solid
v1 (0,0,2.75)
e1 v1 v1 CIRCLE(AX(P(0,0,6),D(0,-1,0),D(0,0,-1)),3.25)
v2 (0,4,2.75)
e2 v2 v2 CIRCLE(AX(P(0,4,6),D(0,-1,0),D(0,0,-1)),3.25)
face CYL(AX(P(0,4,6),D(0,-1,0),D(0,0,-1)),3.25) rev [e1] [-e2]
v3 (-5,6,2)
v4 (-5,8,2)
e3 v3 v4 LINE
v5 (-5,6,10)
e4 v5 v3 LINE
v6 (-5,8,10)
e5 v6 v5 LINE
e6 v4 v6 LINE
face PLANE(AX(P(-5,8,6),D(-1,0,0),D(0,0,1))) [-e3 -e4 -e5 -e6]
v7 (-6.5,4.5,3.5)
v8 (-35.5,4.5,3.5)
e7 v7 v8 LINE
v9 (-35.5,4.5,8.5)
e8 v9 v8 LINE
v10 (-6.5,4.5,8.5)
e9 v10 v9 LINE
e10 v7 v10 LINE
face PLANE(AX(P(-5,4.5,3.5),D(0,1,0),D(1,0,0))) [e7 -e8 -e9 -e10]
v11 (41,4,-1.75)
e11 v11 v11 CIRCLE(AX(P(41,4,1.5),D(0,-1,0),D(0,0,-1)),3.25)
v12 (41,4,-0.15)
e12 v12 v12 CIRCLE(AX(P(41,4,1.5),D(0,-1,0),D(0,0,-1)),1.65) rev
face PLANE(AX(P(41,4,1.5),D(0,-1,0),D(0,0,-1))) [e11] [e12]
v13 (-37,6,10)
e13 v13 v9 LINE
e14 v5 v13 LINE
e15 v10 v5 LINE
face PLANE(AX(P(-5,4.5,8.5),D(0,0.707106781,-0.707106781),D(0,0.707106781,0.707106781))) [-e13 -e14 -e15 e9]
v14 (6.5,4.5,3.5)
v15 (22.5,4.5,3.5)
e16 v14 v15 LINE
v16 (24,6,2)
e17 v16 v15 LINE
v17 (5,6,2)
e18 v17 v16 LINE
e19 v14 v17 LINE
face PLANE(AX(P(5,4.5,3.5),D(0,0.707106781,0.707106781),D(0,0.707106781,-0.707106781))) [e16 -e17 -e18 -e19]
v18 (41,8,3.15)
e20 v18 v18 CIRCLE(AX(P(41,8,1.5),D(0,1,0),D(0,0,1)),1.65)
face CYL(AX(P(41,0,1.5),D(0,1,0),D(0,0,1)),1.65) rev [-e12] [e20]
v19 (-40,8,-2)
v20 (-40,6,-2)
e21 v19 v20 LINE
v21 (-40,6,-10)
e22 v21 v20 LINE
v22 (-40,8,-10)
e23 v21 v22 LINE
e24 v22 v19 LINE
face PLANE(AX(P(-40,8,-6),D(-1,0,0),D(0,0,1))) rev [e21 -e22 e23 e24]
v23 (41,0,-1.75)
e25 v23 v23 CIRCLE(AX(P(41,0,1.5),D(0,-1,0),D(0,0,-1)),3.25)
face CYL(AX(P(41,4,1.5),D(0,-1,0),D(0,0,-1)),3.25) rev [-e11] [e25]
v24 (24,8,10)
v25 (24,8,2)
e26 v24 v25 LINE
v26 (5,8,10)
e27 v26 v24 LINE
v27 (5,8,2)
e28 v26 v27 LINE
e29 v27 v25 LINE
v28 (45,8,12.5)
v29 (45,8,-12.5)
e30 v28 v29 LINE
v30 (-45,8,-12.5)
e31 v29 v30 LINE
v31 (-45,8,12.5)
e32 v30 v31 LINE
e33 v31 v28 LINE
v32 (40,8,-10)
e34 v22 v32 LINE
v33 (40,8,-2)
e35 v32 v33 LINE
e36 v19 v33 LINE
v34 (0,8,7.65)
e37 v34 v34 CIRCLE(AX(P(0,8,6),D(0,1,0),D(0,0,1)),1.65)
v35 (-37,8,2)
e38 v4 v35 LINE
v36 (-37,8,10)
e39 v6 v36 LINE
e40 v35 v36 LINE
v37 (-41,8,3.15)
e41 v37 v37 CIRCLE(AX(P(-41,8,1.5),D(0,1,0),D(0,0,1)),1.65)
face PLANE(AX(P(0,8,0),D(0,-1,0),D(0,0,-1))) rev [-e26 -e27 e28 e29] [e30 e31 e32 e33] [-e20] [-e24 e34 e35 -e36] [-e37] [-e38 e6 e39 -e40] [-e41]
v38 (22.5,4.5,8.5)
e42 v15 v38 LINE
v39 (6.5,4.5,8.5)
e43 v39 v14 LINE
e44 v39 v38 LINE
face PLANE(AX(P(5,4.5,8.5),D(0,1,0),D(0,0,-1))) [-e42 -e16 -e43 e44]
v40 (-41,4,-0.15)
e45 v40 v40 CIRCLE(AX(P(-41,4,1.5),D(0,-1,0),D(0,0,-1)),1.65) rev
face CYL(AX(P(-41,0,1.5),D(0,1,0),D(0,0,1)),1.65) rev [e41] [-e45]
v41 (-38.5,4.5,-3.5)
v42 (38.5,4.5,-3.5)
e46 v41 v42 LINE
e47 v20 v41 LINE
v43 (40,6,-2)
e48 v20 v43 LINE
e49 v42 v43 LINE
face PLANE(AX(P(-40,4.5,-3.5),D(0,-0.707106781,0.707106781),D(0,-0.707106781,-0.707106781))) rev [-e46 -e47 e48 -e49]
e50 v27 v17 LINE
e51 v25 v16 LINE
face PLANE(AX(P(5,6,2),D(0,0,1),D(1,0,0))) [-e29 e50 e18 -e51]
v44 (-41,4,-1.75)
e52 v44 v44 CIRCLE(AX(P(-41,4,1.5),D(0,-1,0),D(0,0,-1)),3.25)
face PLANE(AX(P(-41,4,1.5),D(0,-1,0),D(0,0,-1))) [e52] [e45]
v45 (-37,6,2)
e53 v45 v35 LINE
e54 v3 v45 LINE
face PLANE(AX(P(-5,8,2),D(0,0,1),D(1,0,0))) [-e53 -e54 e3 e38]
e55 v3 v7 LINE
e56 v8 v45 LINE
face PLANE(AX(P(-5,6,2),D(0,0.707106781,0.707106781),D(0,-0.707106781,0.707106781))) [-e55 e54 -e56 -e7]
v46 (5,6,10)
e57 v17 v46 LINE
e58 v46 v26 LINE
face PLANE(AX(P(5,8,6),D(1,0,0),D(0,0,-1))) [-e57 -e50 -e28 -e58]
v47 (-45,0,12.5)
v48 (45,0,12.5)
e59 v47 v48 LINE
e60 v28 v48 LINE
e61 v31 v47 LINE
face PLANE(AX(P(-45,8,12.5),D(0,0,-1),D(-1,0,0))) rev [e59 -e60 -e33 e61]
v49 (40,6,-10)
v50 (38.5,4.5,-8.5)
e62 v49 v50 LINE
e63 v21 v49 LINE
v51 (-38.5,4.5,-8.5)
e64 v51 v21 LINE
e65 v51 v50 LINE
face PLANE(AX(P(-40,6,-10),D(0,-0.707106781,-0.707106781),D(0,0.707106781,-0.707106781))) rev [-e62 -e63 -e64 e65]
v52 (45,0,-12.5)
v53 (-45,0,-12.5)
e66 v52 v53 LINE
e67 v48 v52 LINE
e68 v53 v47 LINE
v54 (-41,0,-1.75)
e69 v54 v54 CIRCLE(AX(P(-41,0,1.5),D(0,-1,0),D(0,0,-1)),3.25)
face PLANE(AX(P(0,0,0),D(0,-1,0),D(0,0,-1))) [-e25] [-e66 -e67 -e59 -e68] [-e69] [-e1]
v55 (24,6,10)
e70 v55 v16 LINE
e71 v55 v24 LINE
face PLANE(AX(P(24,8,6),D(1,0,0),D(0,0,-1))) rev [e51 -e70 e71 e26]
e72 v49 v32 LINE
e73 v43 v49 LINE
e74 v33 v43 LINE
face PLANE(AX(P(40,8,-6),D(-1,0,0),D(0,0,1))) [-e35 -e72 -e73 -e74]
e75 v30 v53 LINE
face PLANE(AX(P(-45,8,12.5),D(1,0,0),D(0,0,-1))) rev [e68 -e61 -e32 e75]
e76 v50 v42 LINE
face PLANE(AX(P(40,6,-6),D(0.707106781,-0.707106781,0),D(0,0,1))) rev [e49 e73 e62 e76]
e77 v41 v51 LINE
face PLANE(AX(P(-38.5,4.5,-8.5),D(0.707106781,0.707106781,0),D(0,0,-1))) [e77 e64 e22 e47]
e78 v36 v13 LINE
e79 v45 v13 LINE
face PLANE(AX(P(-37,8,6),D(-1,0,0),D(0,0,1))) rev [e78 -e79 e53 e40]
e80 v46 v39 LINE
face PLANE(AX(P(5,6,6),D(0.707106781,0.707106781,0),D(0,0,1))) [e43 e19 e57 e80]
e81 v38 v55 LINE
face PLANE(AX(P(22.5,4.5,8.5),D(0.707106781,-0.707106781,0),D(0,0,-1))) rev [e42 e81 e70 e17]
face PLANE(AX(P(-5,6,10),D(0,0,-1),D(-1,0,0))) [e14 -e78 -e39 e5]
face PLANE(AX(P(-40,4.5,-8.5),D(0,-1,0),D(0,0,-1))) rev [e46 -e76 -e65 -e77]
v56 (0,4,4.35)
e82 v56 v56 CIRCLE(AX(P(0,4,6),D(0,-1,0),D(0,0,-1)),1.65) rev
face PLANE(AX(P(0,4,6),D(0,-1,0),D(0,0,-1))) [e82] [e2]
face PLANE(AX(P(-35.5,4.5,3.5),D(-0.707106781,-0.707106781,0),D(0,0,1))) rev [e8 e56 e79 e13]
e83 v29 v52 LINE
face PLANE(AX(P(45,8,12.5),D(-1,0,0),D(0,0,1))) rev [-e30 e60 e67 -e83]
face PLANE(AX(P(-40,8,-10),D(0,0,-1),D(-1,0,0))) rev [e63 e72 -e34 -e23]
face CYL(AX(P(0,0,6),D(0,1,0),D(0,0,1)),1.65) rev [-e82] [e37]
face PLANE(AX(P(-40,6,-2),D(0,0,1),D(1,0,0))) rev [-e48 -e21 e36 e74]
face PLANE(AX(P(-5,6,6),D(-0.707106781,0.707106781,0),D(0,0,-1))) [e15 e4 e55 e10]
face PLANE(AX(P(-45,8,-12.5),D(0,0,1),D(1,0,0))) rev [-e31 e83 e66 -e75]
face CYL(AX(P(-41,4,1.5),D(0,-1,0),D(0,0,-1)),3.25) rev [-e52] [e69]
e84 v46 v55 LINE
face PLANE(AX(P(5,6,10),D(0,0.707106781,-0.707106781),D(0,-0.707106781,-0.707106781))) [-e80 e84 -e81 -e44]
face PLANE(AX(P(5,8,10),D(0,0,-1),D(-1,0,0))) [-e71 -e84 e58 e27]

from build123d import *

# Parameters (mm, degrees)
ESQUISSE1_W             = 90
ESQUISSE1_H             = 25
BOSS_EXTRU_1_DEPTH      = 8
ESQUISSE3_R             = 1.65
ENL_V_MAT_EXTRU_1_DEPTH = 48.384069053
ESQUISSE4_R             = 3.25
ENL_V_MAT_EXTRU_2_DEPTH = 4
EMPREINTE1_START        = -10
EMPREINTE1_DEPTH        = 8
EMPREINTE1_START_2      = 2
EMPREINTE1_2_DEPTH      = 8
EMPREINTE1_START_3      = -38.94589
EMPREINTE1_3_DEPTH      = 77.9
EMPREINTE1_START_4      = -41
EMPREINTE1_4_DEPTH      = 82


with BuildPart() as part:
    # Esquisse1 → Boss.-Extru.1 (new body)
    with BuildSketch(Plane(origin=(0, 0, 0), x_dir=(1, 0, 0), z_dir=(0, 1, 0))):
        Rectangle(ESQUISSE1_W, ESQUISSE1_H)
    extrude(amount=BOSS_EXTRU_1_DEPTH)

    # Esquisse3 → Enlèv. mat.-Extru.1 (cut, through all)
    with BuildSketch(Plane(origin=(0, 8, 0), x_dir=(1, 0, 0), z_dir=(0, 1, 0))):
        with Locations(Location((0, -6, 0), (0, 0, 270))):
            Circle(ESQUISSE3_R)
        with Locations(Location((41, -1.5, 0), (0, 0, 270))):
            Circle(ESQUISSE3_R)
        with Locations(Location((-41, -1.5, 0), (0, 0, 270))):
            Circle(ESQUISSE3_R)
    extrude(amount=-ENL_V_MAT_EXTRU_1_DEPTH, mode=Mode.SUBTRACT)

    # Esquisse4 → Enlèv. mat.-Extru.2 (cut)
    with BuildSketch(Plane.XZ):
        with Locations(Location((-41, 1.5, 0), (0, 0, 270))):
            Circle(ESQUISSE4_R)
        with Locations(Location((41, 1.5, 0), (0, 0, 270))):
            Circle(ESQUISSE4_R)
        with Locations(Location((0, 6, 0), (0, 0, 270))):
            Circle(ESQUISSE4_R)
    extrude(amount=-ENL_V_MAT_EXTRU_2_DEPTH, mode=Mode.SUBTRACT)

    # Empreinte1: read off the stored shape, not the designer's step
    # Empreinte1 outline → Empreinte1 (cut)
    with BuildSketch(Plane.XY.offset(EMPREINTE1_START)):
        Polygon((40, 8), (-40, 8), (-40, 6), (-38.5, 4.5), (38.5, 4.5), (40, 6), align=None)
    extrude(amount=EMPREINTE1_DEPTH, mode=Mode.SUBTRACT)

    # Empreinte1 2 outline → Empreinte1 2 (cut)
    with BuildSketch(Plane.XY.offset(EMPREINTE1_START_2)):
        Polygon((6.5, 4.5), (22.5, 4.5), (24, 6), (24, 8), (5, 8), (5, 6), align=None)
        Polygon((-35.5, 4.5), (-6.5, 4.5), (-5, 6), (-5, 8), (-37, 8), (-37, 6), align=None)
    extrude(amount=EMPREINTE1_2_DEPTH, mode=Mode.SUBTRACT)

    # Empreinte1 3 outline → Empreinte1 3 (add)
    with BuildSketch(Plane.YZ.offset(EMPREINTE1_START_3)):
        Polygon((4.5, 2), (6, 2), (4.5, 3.5), align=None)
        Polygon((4.5, 10), (4.5, 8.5), (6, 10), align=None)
        Polygon((6, -10), (4.5, -8.5), (4.5, -10), align=None)
        Polygon((4.5, -2), (4.5, -3.5), (6, -2), align=None)
    extrude(amount=EMPREINTE1_3_DEPTH)

    # Empreinte1 4 outline → Empreinte1 4 (add)
    with BuildSketch(Plane.YZ.offset(EMPREINTE1_START_4)):
        Polygon((6, -10), (4.5, -8.5), (4.5, -10), align=None)
        Polygon((4.5, -2), (4.5, -3.5), (6, -2), align=None)
    extrude(amount=EMPREINTE1_4_DEPTH)


solid = part.part
